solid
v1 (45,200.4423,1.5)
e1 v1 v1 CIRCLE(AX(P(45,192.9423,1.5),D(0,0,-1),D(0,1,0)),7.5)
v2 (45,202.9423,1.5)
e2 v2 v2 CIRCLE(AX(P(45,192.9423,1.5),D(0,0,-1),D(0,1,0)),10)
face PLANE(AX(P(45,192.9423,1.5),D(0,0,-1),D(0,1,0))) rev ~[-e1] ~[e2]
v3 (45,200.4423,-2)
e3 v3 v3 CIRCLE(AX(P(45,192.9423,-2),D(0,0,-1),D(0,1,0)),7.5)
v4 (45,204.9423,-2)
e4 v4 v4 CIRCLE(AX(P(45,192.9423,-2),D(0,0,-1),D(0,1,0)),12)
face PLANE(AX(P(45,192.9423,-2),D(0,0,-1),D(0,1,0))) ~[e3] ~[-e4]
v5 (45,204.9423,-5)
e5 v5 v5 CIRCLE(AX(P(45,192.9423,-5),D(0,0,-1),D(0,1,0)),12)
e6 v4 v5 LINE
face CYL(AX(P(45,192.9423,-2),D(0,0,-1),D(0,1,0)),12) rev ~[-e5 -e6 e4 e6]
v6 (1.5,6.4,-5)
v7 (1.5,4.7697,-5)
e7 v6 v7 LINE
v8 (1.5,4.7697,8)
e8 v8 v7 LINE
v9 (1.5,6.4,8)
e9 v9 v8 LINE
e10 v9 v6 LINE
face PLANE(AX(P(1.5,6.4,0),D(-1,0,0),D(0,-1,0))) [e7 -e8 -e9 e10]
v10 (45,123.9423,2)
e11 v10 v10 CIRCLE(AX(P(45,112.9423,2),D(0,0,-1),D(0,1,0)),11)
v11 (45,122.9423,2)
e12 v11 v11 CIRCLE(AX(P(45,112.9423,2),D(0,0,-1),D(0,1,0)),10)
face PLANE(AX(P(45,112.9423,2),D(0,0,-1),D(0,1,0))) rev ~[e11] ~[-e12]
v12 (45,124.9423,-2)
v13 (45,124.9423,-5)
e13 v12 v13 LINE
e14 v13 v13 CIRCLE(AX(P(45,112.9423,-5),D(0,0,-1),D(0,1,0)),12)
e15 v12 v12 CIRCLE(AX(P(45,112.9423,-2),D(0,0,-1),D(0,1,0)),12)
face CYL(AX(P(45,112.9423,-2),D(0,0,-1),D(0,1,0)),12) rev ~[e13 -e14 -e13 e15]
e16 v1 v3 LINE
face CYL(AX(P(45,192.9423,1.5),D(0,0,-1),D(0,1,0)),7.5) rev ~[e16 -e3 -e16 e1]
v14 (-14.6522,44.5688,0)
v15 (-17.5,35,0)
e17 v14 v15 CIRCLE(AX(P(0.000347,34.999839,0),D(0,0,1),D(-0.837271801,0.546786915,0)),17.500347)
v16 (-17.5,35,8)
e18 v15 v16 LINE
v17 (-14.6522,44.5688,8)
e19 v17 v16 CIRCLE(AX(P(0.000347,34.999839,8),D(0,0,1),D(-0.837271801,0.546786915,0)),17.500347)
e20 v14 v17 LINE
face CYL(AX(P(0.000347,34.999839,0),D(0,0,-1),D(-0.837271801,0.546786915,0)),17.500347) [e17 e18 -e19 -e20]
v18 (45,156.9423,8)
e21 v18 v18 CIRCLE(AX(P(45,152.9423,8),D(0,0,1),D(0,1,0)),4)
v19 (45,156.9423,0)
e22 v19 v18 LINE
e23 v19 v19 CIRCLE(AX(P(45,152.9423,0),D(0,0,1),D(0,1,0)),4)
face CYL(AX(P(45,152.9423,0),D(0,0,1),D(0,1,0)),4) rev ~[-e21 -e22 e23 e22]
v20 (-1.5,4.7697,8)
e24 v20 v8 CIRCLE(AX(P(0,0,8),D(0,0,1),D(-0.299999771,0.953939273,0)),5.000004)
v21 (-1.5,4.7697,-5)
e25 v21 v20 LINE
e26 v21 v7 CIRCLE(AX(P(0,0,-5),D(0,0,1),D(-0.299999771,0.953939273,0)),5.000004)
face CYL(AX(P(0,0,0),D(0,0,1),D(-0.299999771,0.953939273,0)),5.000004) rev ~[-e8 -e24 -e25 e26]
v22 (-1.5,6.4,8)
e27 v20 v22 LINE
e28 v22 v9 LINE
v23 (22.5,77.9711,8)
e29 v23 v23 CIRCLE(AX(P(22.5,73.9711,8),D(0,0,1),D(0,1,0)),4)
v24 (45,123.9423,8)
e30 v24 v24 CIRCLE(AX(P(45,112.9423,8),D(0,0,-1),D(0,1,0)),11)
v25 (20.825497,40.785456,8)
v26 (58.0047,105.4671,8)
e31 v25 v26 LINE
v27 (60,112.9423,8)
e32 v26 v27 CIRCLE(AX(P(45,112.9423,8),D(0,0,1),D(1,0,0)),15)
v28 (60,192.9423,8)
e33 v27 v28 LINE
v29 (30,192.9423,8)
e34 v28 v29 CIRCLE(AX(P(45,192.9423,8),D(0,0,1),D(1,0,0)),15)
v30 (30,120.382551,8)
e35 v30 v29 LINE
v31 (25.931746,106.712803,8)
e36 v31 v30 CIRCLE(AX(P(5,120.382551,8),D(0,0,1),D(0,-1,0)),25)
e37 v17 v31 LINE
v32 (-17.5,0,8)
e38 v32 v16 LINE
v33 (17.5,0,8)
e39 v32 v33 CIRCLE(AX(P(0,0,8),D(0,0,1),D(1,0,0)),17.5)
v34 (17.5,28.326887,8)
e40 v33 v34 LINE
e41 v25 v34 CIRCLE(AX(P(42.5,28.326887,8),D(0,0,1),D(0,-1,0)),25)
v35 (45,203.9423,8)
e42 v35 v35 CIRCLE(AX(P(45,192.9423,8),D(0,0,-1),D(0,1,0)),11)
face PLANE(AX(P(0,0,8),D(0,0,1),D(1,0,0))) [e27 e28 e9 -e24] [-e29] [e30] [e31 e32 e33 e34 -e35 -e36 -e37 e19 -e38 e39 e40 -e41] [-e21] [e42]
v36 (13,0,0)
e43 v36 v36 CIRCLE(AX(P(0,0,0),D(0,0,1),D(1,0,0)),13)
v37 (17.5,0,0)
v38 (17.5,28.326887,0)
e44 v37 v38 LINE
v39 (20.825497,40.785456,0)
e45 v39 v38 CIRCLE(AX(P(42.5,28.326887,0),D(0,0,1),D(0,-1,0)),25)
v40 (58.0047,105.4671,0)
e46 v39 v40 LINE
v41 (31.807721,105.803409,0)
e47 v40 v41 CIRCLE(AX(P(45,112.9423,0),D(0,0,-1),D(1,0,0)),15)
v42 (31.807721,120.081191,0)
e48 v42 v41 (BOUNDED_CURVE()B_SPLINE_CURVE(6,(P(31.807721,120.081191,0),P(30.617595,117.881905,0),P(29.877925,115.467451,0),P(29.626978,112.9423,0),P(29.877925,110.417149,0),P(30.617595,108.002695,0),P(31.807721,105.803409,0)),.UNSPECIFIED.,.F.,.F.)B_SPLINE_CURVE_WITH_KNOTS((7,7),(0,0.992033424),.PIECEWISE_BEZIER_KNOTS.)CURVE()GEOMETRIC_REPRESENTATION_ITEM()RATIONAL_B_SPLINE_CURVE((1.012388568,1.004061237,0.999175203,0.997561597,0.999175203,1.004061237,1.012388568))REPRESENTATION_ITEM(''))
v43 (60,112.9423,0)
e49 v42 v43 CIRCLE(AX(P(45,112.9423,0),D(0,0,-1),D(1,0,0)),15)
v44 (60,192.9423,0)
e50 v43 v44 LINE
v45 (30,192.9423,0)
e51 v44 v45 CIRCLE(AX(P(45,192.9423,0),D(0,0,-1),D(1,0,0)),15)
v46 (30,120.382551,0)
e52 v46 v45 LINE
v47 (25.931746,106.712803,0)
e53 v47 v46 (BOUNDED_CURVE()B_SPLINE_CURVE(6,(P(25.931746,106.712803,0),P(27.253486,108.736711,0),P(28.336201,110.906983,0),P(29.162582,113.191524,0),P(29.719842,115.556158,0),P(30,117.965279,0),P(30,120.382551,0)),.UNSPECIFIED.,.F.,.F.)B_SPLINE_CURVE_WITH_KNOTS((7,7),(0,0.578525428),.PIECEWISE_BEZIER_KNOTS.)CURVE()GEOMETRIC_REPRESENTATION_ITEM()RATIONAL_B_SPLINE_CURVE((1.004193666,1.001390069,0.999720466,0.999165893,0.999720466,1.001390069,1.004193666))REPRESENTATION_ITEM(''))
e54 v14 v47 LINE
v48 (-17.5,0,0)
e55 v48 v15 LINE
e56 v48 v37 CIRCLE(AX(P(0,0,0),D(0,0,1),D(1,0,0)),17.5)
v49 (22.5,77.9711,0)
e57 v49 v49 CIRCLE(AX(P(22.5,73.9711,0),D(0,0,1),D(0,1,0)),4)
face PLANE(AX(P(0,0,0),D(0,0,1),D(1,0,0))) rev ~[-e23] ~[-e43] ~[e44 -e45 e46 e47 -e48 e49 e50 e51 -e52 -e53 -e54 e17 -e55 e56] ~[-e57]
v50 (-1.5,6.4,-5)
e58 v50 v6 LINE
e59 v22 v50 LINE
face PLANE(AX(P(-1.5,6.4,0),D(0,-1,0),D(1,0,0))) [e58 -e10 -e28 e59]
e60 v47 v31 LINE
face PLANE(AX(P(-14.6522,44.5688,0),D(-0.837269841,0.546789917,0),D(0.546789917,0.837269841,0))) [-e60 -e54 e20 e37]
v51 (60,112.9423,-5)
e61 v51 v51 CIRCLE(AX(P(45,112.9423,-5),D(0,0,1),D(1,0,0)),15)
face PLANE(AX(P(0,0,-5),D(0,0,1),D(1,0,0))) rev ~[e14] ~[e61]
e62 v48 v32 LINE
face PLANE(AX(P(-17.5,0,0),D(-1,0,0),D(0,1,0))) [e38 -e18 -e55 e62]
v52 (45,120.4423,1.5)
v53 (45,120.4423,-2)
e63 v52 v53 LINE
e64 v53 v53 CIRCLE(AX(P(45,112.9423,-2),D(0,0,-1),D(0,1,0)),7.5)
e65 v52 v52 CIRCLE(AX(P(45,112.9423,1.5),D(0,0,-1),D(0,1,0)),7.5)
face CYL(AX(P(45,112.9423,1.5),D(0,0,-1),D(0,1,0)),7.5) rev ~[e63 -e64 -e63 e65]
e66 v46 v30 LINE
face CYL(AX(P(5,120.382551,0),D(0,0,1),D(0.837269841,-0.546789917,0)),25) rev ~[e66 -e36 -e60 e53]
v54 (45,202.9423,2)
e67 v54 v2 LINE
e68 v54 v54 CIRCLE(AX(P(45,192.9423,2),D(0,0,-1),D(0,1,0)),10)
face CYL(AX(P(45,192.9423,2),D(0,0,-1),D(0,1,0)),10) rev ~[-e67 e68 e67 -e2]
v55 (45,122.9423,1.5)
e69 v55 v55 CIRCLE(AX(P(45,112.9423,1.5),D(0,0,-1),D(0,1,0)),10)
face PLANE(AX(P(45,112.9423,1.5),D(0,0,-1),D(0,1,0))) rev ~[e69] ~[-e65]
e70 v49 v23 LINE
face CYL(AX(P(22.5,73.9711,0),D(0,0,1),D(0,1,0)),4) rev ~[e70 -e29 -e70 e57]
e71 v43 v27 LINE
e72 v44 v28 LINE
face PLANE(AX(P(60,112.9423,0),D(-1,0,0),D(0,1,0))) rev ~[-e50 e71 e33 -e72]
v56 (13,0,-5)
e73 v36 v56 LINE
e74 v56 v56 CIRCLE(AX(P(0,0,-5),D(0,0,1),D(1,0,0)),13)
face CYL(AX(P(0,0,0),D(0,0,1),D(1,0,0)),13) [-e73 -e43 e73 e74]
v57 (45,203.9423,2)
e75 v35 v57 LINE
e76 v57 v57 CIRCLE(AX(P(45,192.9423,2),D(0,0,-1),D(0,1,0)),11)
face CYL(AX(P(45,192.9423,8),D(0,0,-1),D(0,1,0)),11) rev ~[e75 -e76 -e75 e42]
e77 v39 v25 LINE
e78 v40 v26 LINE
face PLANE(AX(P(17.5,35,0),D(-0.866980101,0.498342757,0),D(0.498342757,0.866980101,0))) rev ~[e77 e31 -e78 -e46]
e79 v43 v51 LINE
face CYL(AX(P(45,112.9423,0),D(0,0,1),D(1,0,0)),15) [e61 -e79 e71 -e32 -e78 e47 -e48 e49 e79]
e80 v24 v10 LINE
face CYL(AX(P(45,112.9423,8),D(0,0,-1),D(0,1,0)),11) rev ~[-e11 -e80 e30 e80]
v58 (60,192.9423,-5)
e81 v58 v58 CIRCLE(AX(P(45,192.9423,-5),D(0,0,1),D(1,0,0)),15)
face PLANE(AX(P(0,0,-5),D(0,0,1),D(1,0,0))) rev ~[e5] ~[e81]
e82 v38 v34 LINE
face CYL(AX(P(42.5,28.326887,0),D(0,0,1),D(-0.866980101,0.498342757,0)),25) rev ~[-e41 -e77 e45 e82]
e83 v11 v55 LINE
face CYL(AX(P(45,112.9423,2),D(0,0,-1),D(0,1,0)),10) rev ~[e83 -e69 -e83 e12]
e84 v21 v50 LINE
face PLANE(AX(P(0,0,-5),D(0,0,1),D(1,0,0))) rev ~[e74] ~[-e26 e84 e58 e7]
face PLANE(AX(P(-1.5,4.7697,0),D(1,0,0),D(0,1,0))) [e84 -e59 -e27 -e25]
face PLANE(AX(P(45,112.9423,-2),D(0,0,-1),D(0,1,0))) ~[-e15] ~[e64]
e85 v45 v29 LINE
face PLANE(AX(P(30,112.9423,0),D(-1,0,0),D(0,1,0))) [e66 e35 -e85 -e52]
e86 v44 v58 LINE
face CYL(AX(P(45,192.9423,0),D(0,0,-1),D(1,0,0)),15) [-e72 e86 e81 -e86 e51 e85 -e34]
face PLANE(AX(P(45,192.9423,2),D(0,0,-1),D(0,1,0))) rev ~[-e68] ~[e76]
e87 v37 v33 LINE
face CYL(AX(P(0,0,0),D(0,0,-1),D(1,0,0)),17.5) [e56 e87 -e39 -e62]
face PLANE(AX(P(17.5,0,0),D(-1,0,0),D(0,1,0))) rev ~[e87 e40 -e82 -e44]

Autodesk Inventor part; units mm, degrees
ref_plane "YZ Plane" through (0, 0, 0) normal (1, 0, 0) x (0, 1, 0)
ref_plane "XZ Plane" through (0, 0, 0) normal (0, 1, 0) x (-1, 0, 0)
ref_plane "XY Plane" through (0, 0, 0) normal (0, 0, 1) x (1, 0, 0)
sketch "Skizze1" plane through (0, 0, 0) normal (0, 0, 1) x (1, 0, 0)
  arc A0 (-1.5, 4.7697) -> (1.5, 4.7697) centre (0, 0) ccw
  circle A1 centre (0, 0) radius 13
  line L0 (-33.9343, 0) -> (76.2277, 0) construction
  circle A2 centre (0, 0) radius 17.5
  circle A3 centre (45, 112.9423) radius 15
  line L1 (60, 112.9423) -> (60, 192.9423)
  line L2 (30, 112.9423) -> (30, 192.9423)
  line L3 (45, 112.9423) -> (45, 207.9423) construction
  line L4 (45, 112.9423) -> (45, 127.9423) construction
  line L5 (30, 112.9423) -> (60, 112.9423) construction
  line L6 (-17.5, 0) -> (-17.5, 35)
  line L7 (17.5, 0) -> (17.5, 35)
  line L8 (-17.5, 35) -> (17.5, 35) construction
  circle A4 centre (0, 35) radius 17.5 construction
  line L9 (-14.6522, 44.5688) -> (30, 112.9423)
  arc A5 (-14.6522, 44.5688) -> (-17.5, 35) centre (0, 35) ccw
  line L10 (17.5, 35) -> (58.0047, 105.4671)
  arc A6 (58.0047, 105.4671) -> (60, 112.9423) centre (45, 112.9423) ccw
  line L11 (0, 35) -> (45, 112.9423) construction
  circle A7 centre (45, 192.9423) radius 15
  circle A8 centre (45, 192.9423) radius 5
  circle A9 centre (45, 112.9423) radius 5
  line L12 (-1.5, 6.4) -> (1.5, 6.4)
  line L13 (1.5, 6.4) -> (1.5, 4.7697)
  line L14 (-1.5, 4.7697) -> (-1.5, 6.4)
  line L15 (0, 0) -> (0, 5) construction
  line L16 (0, 5) -> (1.5, 5) construction
  point P0 (22.5, 73.9711)
  point P1 (45, 152.9423)
  point P2 (-13, 0)
  point P3 (13, 0)
  point P4 (0, 6.4)
  dimension "d0" = 10
  dimension "d1" = 26
  dimension "d4" = 35
  dimension "d36" = 0
  dimension "d37" = 30
  dimension "d38" = 60
  dimension "d39" = 35
  dimension "d40" = 90
  dimension "d41" = 80
  dimension "d42" = 45
  dimension "d43" = 10
  dimension "d44" = 10
  dimension "d45" = 40
  dimension "d51" = 3
  dimension "d52" = 1.4
extrude "Extrusion1" add sketch "Skizze1" against normal blind 5 contours A1 | A3 | A7
extrude "Extrusion2" add sketch "Skizze1" along normal blind 8 contours A1 | A2 | A2 L6 A5 L9 A3 L10 L7 | A3 | L2 A7 L1 A3 | A7
fillet "Rundung1" radius 25 2 edges at (30, 112.9423, 4) (17.5, 35, 4)
hole "Bohrung2" at (45, 152.9423, 0) at (22.5, 73.9711, 0) direction (0, 0, 1) diameter 8 end through all
ref_plane "Arbeitsebene1" through (45, 112.9423, 0) normal (1, 0, 0) x (0, 0, -1)
sketch "Skizze3" plane through (45, 112.9423, 0) normal (1, 0, 0) x (0, 0, -1)
  line L0 (-10.6, 0) -> (7.6, 0) construction
  line L1 (-10.6, 80) -> (7.6, 80) construction
  line L2 (-8, 91) -> (-2, 91)
  line L3 (-2, 91) -> (-2, 90)
  line L4 (-2, 90) -> (-1.5, 90)
  line L5 (-1.5, 90) -> (-1.5, 87.5)
  line L6 (-1.5, 87.5) -> (2, 87.5)
  line L7 (-8, 75) -> (-8, 85) construction
  line L8 (5, 85) -> (-8, 85) construction
  line L9 (5, 75) -> (-8, 75) construction
  line L10 (5, 85) -> (5, 75) construction
  line L11 (0, 0) -> (0, 80) construction
  line L12 (2, 87.5) -> (2, 92)
  line L13 (2, 92) -> (5, 92)
  line L14 (-8, 91) -> (-8, 85)
  line L15 (5, 92) -> (5, 85)
  line L16 (-8, 85) -> (5, 85)
  point P0 (0, -112.9423)
  dimension "d53" = 6
  dimension "d54" = 22
  dimension "d55" = 20
  dimension "d56" = 15
  dimension "d57" = 24
  dimension "d58" = 3
  dimension "d59" = 0.5
revolve "Umdrehung1" cut sketch "Skizze3" angle 360 about axis through (45, 192.9423, 0) along (0, 0, -1)
pattern_linear "Rechteckige Anordnung1" count 2 spacing 80 along (0, -1, 0) of "Umdrehung1"
properties part number "ParallelSystem_ProximalPart_Driven_v2" material "Edelstahl"
